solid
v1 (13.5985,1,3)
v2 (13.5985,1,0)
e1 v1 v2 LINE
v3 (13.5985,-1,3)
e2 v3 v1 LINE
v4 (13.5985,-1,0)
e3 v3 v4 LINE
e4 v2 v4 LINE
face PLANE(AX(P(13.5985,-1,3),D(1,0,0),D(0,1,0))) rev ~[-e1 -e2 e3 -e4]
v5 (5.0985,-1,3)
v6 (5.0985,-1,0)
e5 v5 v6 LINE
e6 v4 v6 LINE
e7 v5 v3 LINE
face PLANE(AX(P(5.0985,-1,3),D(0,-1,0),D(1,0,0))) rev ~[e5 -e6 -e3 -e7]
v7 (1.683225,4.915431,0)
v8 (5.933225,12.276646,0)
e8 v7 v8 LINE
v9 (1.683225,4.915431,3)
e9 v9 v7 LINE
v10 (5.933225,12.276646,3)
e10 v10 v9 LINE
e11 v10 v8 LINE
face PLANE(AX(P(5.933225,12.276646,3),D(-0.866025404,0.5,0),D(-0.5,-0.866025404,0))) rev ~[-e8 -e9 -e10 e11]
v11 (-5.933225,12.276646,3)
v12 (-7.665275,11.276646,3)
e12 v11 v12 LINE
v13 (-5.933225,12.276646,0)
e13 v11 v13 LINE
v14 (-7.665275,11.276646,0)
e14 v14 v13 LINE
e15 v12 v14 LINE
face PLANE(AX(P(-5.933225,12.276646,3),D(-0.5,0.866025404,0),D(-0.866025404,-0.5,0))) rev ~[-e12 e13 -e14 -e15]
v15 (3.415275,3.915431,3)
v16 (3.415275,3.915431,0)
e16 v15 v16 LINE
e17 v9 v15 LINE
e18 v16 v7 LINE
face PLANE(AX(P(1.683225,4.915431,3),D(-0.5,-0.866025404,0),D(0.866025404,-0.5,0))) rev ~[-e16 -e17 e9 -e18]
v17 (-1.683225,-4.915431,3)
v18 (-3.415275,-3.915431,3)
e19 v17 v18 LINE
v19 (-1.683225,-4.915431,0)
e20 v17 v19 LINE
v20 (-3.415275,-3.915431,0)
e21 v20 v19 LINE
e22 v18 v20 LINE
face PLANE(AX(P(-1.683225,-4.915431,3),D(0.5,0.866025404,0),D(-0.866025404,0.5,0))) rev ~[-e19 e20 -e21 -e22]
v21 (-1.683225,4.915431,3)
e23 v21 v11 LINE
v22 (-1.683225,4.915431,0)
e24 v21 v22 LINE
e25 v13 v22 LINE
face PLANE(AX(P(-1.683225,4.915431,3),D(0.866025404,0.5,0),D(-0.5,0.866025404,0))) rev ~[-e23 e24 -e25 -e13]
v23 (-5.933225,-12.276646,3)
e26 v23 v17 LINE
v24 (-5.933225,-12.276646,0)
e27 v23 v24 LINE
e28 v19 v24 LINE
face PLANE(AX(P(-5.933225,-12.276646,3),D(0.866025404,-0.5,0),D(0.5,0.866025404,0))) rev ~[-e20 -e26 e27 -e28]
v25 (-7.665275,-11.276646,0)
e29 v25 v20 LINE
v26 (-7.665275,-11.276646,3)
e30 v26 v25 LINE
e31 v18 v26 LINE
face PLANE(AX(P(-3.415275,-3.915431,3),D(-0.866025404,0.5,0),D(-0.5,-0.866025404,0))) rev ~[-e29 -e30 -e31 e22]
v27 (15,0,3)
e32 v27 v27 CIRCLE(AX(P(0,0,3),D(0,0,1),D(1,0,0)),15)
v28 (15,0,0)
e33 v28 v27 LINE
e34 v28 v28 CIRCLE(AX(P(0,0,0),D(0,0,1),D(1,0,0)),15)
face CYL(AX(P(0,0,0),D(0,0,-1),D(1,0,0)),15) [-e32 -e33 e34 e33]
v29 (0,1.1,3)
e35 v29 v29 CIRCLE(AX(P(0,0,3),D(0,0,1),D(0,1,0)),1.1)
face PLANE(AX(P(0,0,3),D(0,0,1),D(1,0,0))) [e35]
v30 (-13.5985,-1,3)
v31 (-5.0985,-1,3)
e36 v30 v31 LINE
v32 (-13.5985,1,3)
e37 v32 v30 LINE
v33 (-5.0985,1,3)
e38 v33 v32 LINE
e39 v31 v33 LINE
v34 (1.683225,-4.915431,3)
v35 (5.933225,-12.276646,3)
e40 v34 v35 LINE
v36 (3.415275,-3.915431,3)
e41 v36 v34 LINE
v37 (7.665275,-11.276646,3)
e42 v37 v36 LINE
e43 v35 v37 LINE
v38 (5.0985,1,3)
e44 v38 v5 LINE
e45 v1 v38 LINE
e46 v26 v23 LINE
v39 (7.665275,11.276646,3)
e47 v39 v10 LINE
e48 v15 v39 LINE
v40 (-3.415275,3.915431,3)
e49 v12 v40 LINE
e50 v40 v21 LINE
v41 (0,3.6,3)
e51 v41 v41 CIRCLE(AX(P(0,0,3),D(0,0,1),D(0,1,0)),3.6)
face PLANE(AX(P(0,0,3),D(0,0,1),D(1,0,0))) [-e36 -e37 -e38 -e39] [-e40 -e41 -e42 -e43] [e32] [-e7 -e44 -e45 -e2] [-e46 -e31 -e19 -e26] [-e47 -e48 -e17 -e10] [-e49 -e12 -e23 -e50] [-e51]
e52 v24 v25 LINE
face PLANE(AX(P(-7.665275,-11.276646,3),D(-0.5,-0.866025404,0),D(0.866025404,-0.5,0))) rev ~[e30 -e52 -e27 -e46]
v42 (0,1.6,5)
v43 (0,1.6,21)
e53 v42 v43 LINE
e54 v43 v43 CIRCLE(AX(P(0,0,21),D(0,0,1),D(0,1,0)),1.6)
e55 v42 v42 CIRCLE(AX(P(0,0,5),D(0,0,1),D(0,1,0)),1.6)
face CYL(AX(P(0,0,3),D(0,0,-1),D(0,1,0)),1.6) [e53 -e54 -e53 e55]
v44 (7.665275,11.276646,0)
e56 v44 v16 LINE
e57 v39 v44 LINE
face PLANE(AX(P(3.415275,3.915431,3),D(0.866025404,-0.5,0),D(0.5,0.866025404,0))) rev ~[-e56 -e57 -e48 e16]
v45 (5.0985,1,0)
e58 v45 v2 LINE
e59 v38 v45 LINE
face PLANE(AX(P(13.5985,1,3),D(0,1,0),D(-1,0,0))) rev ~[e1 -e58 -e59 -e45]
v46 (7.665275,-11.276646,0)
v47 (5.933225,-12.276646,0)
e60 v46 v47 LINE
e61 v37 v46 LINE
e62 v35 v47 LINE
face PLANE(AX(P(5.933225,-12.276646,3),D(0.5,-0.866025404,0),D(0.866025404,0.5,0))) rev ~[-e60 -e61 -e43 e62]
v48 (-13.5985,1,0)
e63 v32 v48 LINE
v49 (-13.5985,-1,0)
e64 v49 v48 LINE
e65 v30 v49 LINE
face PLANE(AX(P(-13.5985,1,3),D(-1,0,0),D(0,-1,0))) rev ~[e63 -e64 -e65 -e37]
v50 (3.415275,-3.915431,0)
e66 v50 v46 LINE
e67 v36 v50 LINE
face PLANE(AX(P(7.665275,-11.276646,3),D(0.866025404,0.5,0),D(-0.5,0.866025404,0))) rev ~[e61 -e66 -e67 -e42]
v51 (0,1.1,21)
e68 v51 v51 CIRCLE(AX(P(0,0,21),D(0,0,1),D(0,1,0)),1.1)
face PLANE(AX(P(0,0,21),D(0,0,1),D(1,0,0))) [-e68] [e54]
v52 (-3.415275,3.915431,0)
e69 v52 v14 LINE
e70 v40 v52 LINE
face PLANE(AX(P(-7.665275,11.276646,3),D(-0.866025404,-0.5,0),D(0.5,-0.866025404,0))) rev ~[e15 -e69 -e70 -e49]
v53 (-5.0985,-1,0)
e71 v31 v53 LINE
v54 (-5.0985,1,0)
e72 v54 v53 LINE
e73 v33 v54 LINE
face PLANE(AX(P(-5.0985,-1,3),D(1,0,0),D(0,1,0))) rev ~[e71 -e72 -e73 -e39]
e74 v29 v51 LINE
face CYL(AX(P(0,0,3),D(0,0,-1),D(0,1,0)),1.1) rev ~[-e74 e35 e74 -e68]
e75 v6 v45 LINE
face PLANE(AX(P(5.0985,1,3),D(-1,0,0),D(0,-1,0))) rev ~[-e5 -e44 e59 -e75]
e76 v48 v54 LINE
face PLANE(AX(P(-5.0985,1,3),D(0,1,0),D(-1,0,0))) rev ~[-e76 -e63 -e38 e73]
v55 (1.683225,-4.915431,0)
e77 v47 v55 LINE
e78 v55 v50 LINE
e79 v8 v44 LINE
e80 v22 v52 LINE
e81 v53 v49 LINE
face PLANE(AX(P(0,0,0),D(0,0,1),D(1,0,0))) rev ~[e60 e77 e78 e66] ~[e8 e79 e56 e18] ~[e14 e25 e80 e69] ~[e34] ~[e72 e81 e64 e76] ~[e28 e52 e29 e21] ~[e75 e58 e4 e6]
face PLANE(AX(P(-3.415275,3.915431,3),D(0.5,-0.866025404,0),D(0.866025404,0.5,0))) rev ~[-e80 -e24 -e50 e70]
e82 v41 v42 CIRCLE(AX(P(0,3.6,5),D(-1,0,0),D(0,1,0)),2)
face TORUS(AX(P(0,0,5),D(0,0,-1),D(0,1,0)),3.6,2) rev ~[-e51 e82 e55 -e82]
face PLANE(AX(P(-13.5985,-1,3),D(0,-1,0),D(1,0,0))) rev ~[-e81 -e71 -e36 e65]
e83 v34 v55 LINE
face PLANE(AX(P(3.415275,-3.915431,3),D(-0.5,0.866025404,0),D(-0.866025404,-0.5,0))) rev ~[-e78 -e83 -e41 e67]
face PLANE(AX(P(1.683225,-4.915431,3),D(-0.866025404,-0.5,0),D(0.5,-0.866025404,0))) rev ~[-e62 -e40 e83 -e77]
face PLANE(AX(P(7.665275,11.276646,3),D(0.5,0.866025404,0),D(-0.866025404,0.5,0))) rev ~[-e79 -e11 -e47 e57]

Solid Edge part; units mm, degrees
sketch "Sketch1" plane through (0, 0, 0) normal (0, 0, 1) x (1, 0, 0)
  circle A0 centre (0, 0) radius 15
extrude "Protrusion1" add sketch "Sketch1" along normal blind 3
sketch "Sketch2" plane through (0, 0, 3) normal (0, 0, 1) x (0, 1, 0)
  circle A0 centre (0, 0) radius 1.6
  circle A1 centre (0, 0) radius 1.1
extrude "ExtrudedProtrusion_2" add sketch "Sketch2" along normal blind 18
fillet "Round_1" radius 2 1 edges at (0, -1.6, 3)
sketch "Sketch3" plane through (0, 0, 3) normal (0, 0, 1) x (0, 1, 0)
  line L0 (1, -13.5985) -> (1, -5.0985)
  line L1 (1, -5.0985) -> (-1, -5.0985)
  line L2 (-1, -5.0985) -> (-1, -13.5985)
  line L3 (-1, -13.5985) -> (1, -13.5985)
extrude "Cutout1" cut sketch "Sketch3" against normal up to next
pattern_circular "Pattern1" count 6 over 360 about axis through (0, 0, 3) along (0, 0, 1) of "Cutout1"
